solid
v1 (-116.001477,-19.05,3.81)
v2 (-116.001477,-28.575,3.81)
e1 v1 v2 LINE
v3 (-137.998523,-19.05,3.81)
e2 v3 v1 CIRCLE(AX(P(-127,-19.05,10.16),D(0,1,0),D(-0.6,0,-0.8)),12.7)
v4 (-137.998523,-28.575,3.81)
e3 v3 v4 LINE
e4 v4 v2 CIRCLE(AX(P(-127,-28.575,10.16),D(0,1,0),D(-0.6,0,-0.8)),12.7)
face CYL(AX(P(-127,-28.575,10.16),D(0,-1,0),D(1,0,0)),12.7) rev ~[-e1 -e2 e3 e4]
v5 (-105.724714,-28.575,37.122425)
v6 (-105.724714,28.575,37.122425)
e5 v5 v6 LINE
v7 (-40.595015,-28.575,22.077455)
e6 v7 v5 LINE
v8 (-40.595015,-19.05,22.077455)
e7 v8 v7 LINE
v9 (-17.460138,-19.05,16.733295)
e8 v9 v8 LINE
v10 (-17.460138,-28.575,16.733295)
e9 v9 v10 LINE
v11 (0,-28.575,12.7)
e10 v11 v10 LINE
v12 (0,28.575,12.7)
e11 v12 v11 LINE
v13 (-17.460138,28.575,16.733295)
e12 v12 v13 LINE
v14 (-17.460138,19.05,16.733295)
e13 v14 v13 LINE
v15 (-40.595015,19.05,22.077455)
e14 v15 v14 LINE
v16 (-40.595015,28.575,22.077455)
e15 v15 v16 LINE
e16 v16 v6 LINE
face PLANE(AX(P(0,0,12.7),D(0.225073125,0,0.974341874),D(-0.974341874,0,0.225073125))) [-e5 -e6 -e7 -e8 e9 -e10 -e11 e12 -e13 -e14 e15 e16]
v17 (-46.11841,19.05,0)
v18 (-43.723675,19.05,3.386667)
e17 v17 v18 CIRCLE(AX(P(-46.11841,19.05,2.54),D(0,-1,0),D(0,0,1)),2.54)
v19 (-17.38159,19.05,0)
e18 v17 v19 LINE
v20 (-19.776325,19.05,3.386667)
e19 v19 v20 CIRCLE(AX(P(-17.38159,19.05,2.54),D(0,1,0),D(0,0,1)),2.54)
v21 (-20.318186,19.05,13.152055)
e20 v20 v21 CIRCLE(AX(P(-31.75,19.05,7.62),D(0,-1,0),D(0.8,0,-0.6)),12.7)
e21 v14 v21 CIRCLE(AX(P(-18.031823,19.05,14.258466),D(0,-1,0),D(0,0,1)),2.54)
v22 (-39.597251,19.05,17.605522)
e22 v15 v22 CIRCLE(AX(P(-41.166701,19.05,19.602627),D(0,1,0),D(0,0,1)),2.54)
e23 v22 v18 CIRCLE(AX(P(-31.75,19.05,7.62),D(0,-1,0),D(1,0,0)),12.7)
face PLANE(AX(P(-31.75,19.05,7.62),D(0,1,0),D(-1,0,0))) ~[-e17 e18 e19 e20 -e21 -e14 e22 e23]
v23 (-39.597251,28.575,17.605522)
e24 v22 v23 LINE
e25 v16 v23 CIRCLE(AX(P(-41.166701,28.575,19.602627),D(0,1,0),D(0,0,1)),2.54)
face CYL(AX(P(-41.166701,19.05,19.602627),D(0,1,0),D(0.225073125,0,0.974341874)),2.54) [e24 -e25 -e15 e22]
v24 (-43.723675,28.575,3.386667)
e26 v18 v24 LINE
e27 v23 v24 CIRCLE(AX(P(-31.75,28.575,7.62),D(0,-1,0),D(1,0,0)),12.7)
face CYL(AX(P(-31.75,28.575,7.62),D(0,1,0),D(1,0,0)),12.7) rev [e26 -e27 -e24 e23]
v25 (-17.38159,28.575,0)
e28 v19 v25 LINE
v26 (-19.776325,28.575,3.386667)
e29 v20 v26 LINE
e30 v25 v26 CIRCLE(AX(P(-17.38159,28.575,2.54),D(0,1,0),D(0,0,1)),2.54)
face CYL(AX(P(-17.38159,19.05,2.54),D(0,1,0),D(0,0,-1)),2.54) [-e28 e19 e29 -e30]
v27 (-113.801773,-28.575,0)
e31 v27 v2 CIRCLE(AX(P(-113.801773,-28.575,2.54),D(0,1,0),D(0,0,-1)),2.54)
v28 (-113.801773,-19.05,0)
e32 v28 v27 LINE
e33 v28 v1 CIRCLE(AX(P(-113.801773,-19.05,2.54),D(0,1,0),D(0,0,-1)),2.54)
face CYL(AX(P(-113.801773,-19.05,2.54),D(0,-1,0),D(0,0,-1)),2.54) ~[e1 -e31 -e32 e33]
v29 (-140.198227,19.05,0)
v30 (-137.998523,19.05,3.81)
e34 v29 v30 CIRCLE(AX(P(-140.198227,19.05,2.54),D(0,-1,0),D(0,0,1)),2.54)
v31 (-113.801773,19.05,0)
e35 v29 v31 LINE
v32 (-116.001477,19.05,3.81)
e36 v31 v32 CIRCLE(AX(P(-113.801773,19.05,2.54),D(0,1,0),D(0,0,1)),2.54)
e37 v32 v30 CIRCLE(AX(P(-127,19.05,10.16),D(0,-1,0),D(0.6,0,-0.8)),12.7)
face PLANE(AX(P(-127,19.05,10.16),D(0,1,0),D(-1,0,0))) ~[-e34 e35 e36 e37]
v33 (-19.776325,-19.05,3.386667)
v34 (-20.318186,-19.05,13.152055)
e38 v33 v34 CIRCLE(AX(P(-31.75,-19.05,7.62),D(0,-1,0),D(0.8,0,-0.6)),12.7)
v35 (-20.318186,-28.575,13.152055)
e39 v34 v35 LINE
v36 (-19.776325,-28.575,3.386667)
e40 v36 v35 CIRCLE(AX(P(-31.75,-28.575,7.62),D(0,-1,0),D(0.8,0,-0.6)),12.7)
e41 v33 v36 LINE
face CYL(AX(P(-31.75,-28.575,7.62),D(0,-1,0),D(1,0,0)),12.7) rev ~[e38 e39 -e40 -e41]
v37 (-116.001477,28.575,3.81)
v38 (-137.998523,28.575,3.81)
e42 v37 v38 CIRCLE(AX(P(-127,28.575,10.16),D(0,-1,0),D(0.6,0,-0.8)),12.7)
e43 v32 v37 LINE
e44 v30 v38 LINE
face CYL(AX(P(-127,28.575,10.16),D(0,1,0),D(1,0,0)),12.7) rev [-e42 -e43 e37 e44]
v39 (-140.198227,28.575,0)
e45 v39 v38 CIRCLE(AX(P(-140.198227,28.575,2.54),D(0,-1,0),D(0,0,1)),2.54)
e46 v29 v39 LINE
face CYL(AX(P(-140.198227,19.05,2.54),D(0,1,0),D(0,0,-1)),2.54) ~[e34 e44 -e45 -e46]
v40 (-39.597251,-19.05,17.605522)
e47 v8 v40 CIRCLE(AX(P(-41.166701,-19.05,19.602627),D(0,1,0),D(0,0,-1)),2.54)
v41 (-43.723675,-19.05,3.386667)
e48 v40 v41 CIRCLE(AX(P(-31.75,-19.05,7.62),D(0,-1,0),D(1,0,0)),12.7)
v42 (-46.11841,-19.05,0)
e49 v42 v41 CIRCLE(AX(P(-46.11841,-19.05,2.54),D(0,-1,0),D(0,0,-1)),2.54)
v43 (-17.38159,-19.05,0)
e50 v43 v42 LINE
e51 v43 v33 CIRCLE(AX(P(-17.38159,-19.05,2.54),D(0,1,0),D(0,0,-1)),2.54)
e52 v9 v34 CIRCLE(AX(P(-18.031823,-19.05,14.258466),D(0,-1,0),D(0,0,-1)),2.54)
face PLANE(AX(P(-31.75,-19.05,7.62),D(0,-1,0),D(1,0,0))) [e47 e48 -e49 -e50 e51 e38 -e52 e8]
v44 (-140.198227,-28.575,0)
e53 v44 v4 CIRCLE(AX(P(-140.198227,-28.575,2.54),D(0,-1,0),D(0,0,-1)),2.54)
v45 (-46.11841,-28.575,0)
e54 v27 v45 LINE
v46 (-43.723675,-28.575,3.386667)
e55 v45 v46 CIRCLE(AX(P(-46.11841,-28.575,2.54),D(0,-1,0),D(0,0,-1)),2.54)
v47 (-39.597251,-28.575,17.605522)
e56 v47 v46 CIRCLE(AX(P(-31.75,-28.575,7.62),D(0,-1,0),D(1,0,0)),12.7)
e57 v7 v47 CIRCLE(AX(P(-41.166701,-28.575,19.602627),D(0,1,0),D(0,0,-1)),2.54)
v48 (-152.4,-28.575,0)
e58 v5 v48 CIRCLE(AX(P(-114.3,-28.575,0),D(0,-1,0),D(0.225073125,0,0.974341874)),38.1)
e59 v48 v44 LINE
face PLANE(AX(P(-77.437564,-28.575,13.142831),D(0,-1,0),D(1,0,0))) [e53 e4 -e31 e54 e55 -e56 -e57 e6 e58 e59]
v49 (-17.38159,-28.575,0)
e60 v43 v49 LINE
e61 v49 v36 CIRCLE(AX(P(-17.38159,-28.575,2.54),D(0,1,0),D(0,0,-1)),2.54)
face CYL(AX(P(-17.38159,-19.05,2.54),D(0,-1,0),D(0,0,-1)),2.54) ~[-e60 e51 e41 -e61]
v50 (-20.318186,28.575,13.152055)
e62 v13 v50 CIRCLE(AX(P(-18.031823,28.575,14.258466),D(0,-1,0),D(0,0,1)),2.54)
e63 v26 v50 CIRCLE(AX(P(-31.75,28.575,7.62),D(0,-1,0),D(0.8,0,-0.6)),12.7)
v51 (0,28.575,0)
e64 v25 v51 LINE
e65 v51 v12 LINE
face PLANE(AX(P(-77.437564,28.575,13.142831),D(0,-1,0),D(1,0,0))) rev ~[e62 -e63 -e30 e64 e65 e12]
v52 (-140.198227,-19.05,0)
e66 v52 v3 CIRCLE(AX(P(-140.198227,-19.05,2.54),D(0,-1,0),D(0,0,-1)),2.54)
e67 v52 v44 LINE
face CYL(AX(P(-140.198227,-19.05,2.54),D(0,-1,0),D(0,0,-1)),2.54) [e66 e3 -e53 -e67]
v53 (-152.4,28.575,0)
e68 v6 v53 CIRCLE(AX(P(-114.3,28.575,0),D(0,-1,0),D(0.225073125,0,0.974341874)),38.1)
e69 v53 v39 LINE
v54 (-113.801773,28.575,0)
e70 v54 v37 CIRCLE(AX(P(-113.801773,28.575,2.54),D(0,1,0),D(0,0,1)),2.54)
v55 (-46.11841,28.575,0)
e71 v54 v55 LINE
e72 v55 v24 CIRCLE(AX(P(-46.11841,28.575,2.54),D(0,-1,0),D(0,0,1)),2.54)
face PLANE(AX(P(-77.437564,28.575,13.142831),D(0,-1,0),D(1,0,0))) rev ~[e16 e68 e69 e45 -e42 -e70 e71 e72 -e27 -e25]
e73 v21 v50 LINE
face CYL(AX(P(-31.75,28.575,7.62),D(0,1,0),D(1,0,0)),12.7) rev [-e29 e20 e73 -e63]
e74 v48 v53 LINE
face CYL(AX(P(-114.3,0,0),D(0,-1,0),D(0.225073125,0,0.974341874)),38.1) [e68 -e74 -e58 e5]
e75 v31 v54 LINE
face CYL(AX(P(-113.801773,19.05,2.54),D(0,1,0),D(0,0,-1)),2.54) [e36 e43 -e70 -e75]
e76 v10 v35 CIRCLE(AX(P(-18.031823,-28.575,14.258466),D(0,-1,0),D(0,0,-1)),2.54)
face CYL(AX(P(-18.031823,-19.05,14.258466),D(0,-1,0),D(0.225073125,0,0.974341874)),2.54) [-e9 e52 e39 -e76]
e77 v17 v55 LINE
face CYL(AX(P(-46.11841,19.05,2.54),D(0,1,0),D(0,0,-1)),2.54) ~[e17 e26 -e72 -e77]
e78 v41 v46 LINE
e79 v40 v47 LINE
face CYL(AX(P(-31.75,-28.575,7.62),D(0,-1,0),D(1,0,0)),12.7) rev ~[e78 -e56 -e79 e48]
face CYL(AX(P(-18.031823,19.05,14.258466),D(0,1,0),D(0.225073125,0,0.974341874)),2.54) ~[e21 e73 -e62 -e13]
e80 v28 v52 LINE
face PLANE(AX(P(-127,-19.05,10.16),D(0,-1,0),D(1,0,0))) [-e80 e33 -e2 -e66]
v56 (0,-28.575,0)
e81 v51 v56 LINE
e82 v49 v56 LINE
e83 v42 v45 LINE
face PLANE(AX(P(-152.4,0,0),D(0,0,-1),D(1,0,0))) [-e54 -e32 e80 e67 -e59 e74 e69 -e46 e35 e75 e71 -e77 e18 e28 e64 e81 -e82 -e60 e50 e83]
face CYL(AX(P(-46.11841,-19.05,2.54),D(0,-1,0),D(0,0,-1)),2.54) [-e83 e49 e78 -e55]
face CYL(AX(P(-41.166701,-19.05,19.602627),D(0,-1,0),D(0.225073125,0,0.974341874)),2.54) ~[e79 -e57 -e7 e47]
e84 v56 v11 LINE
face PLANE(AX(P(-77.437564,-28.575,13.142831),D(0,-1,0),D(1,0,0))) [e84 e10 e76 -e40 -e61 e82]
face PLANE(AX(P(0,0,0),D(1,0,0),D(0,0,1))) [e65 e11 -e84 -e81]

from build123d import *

# Parameters (mm, degrees)
F1_DEPTH = 28.575
F2_R     = 12.7
F3_DEPTH = 9.525
F4_R     = 2.54


# Not quite as in the source:
# - a pattern or mirror of a feature is missing from the dataset's text; its kind, count and spacing are read off the source's solid


with BuildPart() as f1:
    # F0 (on Front) → F1 (new body, symmetric)
    with BuildSketch(Plane.XZ):
        with BuildLine():
            Line((-152.4, 0), (0, 0))
            Line((0, 0), (0, 12.7))
            Line((0, 12.7), (-105.7247139353, 37.1224254179))
            ThreePointArc((-105.7247139353, 37.1224254179), (-138.0159397973, 29.8188564424), (-152.4, 0))
        make_face()
    extrude(amount=F1_DEPTH, both=True)

    # F2 (on face) → F3 (cut)
    with BuildSketch(Plane.XZ.offset(28.575)):
        with Locations((-127, 10.16)):
            Circle(F2_R)
        with Locations((-31.75, 7.62)):
            Circle(F2_R)
    f3 = extrude(amount=-F3_DEPTH, mode=Mode.SUBTRACT)

    # F3_copies: F3 across plane
    add(f3.mirror(Plane.ZX), mode=Mode.SUBTRACT)

    # F4
    f4_edges = [f1.edges().sort_by_distance(p)[0] for p in [
        (-25.256061, -23.8125, 18.534154),
        (-32.799092, -23.8125, 20.276595),
        (-41.91, -23.8125, 0),
        (-21.59, -23.8125, 0),
        (-134.62, -23.8125, 0),
        (-119.38, -23.8125, 0),
        (-21.59, 23.8125, 0),
        (-41.91, 23.8125, 0),
        (-119.38, 23.8125, 0),
        (-134.62, 23.8125, 0),
        (-32.799092, 23.8125, 20.276595),
        (-25.256061, 23.8125, 18.534154),
    ]]
    fillet(f4_edges, radius=F4_R)


solid = f1.part
